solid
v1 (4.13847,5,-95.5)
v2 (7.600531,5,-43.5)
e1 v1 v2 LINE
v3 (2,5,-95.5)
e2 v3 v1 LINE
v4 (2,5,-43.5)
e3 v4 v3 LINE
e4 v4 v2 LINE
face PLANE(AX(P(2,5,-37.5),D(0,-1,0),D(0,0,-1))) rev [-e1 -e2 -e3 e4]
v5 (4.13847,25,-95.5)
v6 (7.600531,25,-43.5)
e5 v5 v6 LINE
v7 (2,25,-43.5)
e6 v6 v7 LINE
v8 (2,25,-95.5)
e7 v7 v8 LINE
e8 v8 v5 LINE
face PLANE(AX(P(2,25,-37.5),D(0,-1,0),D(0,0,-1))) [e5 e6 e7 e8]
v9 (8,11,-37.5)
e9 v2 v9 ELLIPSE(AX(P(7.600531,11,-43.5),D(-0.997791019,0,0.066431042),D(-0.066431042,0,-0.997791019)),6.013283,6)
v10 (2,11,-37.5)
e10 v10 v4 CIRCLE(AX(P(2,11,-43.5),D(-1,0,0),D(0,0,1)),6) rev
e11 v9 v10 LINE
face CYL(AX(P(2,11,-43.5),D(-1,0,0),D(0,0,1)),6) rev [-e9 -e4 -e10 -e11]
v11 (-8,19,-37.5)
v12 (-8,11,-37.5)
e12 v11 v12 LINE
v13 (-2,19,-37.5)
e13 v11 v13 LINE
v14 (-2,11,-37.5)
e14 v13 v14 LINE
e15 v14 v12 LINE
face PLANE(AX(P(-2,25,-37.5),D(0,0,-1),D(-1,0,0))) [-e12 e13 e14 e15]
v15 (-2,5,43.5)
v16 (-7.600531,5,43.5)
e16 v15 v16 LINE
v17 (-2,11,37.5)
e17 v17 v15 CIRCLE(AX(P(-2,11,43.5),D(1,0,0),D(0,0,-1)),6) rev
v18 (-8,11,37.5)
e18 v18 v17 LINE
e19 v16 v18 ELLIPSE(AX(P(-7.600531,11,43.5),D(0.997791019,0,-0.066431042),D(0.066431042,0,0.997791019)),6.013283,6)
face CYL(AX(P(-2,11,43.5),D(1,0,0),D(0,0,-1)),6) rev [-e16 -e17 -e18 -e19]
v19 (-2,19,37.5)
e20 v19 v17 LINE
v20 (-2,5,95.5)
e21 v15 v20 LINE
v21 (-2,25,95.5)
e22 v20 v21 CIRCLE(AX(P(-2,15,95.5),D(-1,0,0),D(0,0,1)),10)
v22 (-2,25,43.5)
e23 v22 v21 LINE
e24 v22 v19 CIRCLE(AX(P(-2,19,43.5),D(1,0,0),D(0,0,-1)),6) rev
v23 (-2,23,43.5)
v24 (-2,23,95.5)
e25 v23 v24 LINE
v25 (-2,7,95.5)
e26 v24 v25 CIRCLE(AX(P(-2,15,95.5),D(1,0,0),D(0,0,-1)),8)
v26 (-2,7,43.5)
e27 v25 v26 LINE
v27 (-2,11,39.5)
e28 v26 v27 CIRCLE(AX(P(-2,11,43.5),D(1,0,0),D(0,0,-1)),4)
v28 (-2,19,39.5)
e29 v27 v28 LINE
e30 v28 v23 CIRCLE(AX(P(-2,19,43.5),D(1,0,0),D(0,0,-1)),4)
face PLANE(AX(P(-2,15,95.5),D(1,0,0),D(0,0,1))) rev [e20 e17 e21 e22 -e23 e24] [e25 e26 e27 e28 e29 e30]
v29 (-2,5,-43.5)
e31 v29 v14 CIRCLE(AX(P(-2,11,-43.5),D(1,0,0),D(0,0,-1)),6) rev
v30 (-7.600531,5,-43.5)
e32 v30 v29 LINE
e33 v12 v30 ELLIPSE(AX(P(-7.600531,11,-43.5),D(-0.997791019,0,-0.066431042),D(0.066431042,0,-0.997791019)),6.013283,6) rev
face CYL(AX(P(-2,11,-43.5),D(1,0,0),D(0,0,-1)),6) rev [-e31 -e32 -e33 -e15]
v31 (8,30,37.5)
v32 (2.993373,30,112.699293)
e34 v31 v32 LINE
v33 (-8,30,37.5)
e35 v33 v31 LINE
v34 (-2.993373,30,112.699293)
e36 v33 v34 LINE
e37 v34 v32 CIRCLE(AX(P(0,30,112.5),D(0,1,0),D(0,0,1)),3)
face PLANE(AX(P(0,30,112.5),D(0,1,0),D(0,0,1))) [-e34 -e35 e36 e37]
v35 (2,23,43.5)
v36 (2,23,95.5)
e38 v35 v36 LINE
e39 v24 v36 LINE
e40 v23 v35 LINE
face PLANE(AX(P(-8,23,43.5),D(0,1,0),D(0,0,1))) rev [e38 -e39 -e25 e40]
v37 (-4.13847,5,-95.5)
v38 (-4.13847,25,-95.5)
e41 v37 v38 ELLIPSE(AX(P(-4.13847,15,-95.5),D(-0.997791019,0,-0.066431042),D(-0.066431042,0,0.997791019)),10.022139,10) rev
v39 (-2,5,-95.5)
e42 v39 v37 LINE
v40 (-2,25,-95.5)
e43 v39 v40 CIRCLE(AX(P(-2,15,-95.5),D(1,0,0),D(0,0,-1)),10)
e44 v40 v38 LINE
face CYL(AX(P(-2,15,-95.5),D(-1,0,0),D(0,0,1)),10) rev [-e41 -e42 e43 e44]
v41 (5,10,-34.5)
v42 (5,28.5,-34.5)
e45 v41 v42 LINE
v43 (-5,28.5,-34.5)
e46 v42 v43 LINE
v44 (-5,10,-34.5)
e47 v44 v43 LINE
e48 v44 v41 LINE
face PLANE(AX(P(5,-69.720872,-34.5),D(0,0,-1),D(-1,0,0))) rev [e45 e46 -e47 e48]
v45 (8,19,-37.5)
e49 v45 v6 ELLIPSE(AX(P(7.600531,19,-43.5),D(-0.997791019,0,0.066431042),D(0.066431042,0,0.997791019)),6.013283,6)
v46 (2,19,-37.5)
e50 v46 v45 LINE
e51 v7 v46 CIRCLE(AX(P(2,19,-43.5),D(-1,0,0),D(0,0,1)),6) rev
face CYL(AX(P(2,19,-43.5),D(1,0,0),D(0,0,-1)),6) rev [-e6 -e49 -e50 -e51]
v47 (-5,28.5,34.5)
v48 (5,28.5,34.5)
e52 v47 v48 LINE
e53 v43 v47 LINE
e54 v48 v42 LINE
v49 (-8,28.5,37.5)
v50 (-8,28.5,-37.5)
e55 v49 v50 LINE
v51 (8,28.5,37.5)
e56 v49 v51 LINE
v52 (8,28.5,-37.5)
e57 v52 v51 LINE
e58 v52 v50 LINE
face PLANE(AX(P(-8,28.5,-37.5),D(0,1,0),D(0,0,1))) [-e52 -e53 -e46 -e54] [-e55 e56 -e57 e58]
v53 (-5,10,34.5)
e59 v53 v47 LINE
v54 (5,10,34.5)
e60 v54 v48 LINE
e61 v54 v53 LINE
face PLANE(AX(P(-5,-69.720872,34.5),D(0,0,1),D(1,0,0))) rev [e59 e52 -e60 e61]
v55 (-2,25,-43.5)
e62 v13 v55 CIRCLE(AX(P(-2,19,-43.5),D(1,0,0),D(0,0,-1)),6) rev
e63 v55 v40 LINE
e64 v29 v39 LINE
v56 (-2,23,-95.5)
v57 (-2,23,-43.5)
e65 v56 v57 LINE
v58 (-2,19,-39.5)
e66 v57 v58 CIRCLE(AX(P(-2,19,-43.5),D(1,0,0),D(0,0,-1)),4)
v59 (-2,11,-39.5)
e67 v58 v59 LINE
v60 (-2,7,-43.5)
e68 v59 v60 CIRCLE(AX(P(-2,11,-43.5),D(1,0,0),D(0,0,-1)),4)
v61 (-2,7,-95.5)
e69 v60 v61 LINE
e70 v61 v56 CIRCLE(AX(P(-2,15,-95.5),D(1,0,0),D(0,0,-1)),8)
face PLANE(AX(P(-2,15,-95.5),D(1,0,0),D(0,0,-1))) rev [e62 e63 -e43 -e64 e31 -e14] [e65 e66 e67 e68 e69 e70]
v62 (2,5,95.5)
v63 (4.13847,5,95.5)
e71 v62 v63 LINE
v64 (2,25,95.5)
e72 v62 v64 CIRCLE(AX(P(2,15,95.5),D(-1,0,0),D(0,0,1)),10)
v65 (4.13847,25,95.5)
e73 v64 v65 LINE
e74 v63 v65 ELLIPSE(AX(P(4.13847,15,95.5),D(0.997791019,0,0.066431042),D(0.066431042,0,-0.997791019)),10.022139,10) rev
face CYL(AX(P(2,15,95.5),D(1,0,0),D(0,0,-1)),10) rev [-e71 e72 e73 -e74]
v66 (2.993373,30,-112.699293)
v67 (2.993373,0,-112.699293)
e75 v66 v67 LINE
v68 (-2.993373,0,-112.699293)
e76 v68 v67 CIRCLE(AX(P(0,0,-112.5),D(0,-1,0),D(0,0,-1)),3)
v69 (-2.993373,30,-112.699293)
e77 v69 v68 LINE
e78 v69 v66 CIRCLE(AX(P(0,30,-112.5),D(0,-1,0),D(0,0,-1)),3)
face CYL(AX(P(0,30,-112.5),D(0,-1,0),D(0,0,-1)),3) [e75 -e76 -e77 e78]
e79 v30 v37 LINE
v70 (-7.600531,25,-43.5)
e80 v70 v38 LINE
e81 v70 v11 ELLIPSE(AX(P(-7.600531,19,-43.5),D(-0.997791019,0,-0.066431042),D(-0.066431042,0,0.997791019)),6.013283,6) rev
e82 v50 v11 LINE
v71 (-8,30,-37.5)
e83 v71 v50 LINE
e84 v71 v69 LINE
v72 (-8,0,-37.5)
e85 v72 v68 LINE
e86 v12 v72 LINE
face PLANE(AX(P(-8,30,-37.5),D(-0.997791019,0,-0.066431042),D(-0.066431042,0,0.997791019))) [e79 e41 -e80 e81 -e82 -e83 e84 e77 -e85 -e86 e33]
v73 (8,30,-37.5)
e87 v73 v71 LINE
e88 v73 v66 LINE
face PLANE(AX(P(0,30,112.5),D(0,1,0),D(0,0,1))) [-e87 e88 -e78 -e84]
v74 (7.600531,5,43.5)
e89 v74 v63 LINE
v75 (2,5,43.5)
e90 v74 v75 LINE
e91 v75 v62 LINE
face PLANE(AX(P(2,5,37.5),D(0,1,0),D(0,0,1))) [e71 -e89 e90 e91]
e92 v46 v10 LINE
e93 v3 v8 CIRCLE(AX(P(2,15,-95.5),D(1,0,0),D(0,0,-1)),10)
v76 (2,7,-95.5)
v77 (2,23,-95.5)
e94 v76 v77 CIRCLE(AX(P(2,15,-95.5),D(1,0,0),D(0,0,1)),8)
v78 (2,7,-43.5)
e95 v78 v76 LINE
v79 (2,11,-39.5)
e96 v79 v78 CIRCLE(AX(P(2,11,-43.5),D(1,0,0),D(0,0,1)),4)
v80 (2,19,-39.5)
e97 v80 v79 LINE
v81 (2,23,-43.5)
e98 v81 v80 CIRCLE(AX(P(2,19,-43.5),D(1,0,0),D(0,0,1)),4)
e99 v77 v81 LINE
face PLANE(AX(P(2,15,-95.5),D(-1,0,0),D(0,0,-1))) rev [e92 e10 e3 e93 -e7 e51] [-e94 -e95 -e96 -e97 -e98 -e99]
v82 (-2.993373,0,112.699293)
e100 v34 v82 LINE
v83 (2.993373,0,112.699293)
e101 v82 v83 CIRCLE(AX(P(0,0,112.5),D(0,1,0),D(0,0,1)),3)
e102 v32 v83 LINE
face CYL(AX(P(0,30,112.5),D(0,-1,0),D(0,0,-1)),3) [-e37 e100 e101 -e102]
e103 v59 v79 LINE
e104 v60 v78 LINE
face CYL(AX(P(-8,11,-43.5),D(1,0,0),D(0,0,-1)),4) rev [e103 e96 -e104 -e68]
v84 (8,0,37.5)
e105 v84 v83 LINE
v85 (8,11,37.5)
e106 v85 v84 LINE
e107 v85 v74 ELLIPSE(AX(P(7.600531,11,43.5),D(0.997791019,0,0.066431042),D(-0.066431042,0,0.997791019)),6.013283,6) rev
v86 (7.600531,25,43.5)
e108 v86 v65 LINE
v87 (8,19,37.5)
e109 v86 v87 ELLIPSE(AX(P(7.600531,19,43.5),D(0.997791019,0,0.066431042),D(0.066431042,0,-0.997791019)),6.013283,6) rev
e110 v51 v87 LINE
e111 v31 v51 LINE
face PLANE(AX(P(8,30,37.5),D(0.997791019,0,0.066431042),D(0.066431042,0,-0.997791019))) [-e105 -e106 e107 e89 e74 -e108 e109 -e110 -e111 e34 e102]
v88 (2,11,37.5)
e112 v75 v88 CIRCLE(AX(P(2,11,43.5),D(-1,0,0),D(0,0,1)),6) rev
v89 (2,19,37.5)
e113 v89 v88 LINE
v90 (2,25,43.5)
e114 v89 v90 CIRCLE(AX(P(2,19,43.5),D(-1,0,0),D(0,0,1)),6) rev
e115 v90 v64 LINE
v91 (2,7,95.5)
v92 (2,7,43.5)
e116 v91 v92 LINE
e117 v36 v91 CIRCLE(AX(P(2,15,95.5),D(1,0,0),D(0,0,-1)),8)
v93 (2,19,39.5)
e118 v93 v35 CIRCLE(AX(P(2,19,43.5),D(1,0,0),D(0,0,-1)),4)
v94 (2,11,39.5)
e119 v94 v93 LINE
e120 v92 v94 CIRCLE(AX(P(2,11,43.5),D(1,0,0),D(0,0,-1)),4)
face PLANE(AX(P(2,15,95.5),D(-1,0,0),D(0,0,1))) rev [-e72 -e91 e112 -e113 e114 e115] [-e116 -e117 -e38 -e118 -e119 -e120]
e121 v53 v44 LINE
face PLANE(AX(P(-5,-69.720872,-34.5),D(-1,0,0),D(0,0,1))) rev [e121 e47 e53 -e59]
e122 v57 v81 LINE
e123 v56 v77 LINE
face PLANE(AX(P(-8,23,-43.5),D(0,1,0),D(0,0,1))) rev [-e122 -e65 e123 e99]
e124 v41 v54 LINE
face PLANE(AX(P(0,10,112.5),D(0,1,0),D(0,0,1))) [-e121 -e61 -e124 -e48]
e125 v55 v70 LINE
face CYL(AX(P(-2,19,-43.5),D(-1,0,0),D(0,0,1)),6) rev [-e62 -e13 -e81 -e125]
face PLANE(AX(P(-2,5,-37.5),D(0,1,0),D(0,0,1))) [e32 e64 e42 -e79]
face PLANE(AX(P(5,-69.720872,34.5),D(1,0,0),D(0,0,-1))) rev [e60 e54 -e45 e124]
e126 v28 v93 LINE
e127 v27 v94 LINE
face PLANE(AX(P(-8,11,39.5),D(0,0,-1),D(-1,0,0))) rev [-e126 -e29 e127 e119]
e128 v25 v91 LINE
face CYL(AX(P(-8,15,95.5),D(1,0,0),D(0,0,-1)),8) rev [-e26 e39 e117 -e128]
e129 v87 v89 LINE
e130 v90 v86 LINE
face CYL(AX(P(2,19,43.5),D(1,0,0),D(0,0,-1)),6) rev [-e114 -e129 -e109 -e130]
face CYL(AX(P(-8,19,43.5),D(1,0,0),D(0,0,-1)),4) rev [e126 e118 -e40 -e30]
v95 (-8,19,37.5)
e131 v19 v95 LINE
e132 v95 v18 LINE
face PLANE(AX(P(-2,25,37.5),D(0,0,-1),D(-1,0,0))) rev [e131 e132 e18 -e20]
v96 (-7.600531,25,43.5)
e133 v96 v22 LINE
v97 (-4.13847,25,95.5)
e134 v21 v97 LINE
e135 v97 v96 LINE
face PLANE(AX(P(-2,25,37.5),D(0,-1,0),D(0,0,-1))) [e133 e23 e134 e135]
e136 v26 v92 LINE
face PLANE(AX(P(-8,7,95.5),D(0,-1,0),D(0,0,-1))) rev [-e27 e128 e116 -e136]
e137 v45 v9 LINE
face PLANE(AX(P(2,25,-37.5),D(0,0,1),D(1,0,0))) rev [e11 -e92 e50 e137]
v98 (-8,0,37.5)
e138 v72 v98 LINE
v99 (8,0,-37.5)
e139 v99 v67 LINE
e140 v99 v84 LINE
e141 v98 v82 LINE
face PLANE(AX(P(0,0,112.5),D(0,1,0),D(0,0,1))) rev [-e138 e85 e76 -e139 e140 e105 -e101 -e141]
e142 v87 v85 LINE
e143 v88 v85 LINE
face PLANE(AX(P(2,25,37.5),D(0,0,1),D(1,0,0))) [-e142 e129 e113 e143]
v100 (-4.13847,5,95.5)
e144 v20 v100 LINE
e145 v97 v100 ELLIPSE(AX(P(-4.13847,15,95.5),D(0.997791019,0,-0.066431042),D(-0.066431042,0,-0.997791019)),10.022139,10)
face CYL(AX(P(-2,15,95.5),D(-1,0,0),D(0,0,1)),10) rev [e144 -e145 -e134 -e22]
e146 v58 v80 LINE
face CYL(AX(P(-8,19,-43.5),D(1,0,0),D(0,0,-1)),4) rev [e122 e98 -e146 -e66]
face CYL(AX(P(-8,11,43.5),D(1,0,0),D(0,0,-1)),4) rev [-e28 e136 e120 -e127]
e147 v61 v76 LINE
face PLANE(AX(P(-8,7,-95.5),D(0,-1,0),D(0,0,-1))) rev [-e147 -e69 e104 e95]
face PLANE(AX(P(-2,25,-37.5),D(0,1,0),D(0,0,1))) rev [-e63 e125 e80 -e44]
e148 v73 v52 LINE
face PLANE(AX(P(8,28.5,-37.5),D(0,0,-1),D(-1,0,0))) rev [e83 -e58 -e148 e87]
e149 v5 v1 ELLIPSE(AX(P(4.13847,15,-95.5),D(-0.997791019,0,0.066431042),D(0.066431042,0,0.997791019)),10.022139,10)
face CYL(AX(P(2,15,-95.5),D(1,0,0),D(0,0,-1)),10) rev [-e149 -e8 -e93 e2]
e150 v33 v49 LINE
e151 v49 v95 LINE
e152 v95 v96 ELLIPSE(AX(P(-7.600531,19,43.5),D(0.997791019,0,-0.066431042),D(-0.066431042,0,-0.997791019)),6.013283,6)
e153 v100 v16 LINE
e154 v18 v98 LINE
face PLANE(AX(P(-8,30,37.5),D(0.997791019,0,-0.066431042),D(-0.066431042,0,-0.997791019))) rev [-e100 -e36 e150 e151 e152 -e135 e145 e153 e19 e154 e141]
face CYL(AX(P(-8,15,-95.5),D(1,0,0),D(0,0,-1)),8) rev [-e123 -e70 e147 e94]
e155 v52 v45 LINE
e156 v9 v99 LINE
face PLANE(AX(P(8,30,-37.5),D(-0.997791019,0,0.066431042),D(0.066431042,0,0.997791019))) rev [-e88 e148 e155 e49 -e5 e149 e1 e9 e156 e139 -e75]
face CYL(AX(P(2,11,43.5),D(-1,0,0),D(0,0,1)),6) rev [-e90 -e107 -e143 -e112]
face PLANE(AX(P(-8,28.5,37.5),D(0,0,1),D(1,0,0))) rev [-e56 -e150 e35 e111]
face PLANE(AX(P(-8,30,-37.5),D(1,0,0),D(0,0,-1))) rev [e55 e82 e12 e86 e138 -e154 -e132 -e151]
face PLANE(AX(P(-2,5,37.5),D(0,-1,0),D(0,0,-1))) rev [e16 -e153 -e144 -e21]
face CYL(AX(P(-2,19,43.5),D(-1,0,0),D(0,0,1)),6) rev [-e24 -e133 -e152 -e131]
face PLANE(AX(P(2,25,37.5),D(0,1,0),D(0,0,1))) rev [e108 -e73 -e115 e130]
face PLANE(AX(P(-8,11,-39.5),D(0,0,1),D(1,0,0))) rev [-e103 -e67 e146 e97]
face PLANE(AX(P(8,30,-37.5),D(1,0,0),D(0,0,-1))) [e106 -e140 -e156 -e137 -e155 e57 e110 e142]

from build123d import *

# Parameters (mm, degrees)
BASE_EXTRUDE_DEPTH   = 30
CUT_EXTRUDE1_DEPTH   = 6
FILLET1_R            = 6
FILLET1_OF_MIRROR1_R = 6
MIRROR2_START        = -8
MIRROR2_DEPTH        = 6
MIRROR2_START_2      = 2
MIRROR2_2_DEPTH      = 6
SKETCH5_W            = 16
SKETCH5_H            = 75
CUT_EXTRUDE3_DEPTH   = 1.5
SKETCH6_W            = 10
SKETCH6_H            = 69
CUT_EXTRUDE4_DEPTH   = 18.5
CUT_EXTRUDE5_DEPTH   = 120.750782878


# Read off the part's stored shape, not the designer's step: Mirror2
with BuildPart() as part:
    # Sketch1 → Base-Extrude (new body)
    with BuildSketch(Plane(origin=(0, 0, 0), x_dir=(1, 0, 0), z_dir=(0, 1, 0))):
        with BuildLine():
            Line((8, 37.5), (2.993373056, 112.699293126))
            ThreePointArc((2.993373056, 112.699293126), (0, 115.5), (-2.993373056, 112.699293126))
            Line((-2.993373056, 112.699293126), (-8, 37.5))
            Line((-8, 37.5), (-8, -37.5))
            Line((-8, -37.5), (-2.993373056, -112.699293126))
            ThreePointArc((-2.993373056, -112.699293126), (0, -115.5), (2.993373056, -112.699293126))
            Line((2.993373056, -112.699293126), (8, -37.5))
            Line((8, -37.5), (8, 37.5))
        make_face()
    extrude(amount=BASE_EXTRUDE_DEPTH)

    # Sketch2 → Cut-Extrude1 (cut)
    with BuildSketch(Plane(origin=(8, 0, 0), x_dir=(0, 0, -1), z_dir=(1, 0, 0))):
        with BuildLine():
            Line((-37.5, 5), (-95.5, 5))
            ThreePointArc((-95.5, 5), (-105.5, 15), (-95.5, 25))
            Line((-95.5, 25), (-37.5, 25))
            Line((-37.5, 25), (-37.5, 5))
        make_face()
    cut_extrude1 = extrude(amount=-CUT_EXTRUDE1_DEPTH, mode=Mode.SUBTRACT)

    # Fillet1
    fillet1_edges = [part.edges().sort_by_distance(p)[0] for p in [
        (5, 25, 37.5),
        (5, 5, 37.5),
    ]]
    fillet(fillet1_edges, radius=FILLET1_R)

    # Mirror1: Cut-Extrude1 across plane
    add(cut_extrude1.mirror(Plane(origin=(0, 0, 0), x_dir=(0, 0, 1), z_dir=(1, 0, 0))), mode=Mode.SUBTRACT)

    # Fillet1 of Mirror1
    fillet1_of_mirror1_edges = [part.edges().sort_by_distance(p)[0] for p in [
        (-5, 25, 37.5),
        (-5, 5, 37.5),
    ]]
    fillet(fillet1_of_mirror1_edges, radius=FILLET1_OF_MIRROR1_R)

    # Mirror2 outline → Mirror2 (cut)
    with BuildSketch(Plane.YZ.offset(MIRROR2_START)):
        with BuildLine():
            Line((5, -43.5), (5, -95.5))
            ThreePointArc((5, -95.5), (15, -105.5), (25, -95.5))
            Line((25, -95.5), (25, -43.5))
            ThreePointArc((25, -43.5), (23.242640687, -39.257359313), (19, -37.5))
            Line((19, -37.5), (11, -37.5))
            ThreePointArc((11, -37.5), (6.757359313, -39.257359313), (5, -43.5))
        make_face()
    extrude(amount=MIRROR2_DEPTH, mode=Mode.SUBTRACT)

    # Mirror2 2 outline → Mirror2 2 (cut)
    with BuildSketch(Plane.YZ.offset(MIRROR2_START_2)):
        with BuildLine():
            Line((5, -43.5), (5, -95.5))
            ThreePointArc((5, -95.5), (15, -105.5), (25, -95.5))
            Line((25, -95.5), (25, -43.5))
            ThreePointArc((25, -43.5), (23.242640687, -39.257359313), (19, -37.5))
            Line((19, -37.5), (11, -37.5))
            ThreePointArc((11, -37.5), (6.757359313, -39.257359313), (5, -43.5))
        make_face()
    extrude(amount=MIRROR2_2_DEPTH, mode=Mode.SUBTRACT)

    # Sketch5 → Cut-Extrude3 (cut)
    with BuildSketch(Plane(origin=(0, 30, 0), x_dir=(-1, 0, 0), z_dir=(0, 1, 0))):
        Rectangle(SKETCH5_W, SKETCH5_H)
    extrude(amount=-CUT_EXTRUDE3_DEPTH, mode=Mode.SUBTRACT)

    # Sketch6 → Cut-Extrude4 (cut)
    with BuildSketch(Plane(origin=(0, 28.5, 0), x_dir=(1, 0, 0), z_dir=(0, 1, 0))):
        Rectangle(SKETCH6_W, SKETCH6_H)
    extrude(amount=-CUT_EXTRUDE4_DEPTH, mode=Mode.SUBTRACT)

    # Sketch7 → Cut-Extrude5 (cut, through all)
    with BuildSketch(Plane(origin=(2, 0, 0), x_dir=(0, 0, -1), z_dir=(1, 0, 0))):
        with BuildLine():
            Line((39.5, 11), (39.5, 19))
            ThreePointArc((39.5, 19), (40.671572875, 21.828427125), (43.5, 23))
            Line((43.5, 23), (95.5, 23))
            ThreePointArc((95.5, 23), (103.5, 15), (95.5, 7))
            Line((95.5, 7), (43.5, 7))
            ThreePointArc((43.5, 7), (40.671572875, 8.171572875), (39.5, 11))
        make_face()
        with BuildLine():
            Line((-95.5, 7), (-43.5, 7))
            ThreePointArc((-43.5, 7), (-40.671572875, 8.171572875), (-39.5, 11))
            Line((-39.5, 11), (-39.5, 19))
            ThreePointArc((-39.5, 19), (-40.671572875, 21.828427125), (-43.5, 23))
            Line((-43.5, 23), (-95.5, 23))
            ThreePointArc((-95.5, 23), (-103.5, 15), (-95.5, 7))
        make_face()
    extrude(amount=-CUT_EXTRUDE5_DEPTH, mode=Mode.SUBTRACT)


solid = part.part
